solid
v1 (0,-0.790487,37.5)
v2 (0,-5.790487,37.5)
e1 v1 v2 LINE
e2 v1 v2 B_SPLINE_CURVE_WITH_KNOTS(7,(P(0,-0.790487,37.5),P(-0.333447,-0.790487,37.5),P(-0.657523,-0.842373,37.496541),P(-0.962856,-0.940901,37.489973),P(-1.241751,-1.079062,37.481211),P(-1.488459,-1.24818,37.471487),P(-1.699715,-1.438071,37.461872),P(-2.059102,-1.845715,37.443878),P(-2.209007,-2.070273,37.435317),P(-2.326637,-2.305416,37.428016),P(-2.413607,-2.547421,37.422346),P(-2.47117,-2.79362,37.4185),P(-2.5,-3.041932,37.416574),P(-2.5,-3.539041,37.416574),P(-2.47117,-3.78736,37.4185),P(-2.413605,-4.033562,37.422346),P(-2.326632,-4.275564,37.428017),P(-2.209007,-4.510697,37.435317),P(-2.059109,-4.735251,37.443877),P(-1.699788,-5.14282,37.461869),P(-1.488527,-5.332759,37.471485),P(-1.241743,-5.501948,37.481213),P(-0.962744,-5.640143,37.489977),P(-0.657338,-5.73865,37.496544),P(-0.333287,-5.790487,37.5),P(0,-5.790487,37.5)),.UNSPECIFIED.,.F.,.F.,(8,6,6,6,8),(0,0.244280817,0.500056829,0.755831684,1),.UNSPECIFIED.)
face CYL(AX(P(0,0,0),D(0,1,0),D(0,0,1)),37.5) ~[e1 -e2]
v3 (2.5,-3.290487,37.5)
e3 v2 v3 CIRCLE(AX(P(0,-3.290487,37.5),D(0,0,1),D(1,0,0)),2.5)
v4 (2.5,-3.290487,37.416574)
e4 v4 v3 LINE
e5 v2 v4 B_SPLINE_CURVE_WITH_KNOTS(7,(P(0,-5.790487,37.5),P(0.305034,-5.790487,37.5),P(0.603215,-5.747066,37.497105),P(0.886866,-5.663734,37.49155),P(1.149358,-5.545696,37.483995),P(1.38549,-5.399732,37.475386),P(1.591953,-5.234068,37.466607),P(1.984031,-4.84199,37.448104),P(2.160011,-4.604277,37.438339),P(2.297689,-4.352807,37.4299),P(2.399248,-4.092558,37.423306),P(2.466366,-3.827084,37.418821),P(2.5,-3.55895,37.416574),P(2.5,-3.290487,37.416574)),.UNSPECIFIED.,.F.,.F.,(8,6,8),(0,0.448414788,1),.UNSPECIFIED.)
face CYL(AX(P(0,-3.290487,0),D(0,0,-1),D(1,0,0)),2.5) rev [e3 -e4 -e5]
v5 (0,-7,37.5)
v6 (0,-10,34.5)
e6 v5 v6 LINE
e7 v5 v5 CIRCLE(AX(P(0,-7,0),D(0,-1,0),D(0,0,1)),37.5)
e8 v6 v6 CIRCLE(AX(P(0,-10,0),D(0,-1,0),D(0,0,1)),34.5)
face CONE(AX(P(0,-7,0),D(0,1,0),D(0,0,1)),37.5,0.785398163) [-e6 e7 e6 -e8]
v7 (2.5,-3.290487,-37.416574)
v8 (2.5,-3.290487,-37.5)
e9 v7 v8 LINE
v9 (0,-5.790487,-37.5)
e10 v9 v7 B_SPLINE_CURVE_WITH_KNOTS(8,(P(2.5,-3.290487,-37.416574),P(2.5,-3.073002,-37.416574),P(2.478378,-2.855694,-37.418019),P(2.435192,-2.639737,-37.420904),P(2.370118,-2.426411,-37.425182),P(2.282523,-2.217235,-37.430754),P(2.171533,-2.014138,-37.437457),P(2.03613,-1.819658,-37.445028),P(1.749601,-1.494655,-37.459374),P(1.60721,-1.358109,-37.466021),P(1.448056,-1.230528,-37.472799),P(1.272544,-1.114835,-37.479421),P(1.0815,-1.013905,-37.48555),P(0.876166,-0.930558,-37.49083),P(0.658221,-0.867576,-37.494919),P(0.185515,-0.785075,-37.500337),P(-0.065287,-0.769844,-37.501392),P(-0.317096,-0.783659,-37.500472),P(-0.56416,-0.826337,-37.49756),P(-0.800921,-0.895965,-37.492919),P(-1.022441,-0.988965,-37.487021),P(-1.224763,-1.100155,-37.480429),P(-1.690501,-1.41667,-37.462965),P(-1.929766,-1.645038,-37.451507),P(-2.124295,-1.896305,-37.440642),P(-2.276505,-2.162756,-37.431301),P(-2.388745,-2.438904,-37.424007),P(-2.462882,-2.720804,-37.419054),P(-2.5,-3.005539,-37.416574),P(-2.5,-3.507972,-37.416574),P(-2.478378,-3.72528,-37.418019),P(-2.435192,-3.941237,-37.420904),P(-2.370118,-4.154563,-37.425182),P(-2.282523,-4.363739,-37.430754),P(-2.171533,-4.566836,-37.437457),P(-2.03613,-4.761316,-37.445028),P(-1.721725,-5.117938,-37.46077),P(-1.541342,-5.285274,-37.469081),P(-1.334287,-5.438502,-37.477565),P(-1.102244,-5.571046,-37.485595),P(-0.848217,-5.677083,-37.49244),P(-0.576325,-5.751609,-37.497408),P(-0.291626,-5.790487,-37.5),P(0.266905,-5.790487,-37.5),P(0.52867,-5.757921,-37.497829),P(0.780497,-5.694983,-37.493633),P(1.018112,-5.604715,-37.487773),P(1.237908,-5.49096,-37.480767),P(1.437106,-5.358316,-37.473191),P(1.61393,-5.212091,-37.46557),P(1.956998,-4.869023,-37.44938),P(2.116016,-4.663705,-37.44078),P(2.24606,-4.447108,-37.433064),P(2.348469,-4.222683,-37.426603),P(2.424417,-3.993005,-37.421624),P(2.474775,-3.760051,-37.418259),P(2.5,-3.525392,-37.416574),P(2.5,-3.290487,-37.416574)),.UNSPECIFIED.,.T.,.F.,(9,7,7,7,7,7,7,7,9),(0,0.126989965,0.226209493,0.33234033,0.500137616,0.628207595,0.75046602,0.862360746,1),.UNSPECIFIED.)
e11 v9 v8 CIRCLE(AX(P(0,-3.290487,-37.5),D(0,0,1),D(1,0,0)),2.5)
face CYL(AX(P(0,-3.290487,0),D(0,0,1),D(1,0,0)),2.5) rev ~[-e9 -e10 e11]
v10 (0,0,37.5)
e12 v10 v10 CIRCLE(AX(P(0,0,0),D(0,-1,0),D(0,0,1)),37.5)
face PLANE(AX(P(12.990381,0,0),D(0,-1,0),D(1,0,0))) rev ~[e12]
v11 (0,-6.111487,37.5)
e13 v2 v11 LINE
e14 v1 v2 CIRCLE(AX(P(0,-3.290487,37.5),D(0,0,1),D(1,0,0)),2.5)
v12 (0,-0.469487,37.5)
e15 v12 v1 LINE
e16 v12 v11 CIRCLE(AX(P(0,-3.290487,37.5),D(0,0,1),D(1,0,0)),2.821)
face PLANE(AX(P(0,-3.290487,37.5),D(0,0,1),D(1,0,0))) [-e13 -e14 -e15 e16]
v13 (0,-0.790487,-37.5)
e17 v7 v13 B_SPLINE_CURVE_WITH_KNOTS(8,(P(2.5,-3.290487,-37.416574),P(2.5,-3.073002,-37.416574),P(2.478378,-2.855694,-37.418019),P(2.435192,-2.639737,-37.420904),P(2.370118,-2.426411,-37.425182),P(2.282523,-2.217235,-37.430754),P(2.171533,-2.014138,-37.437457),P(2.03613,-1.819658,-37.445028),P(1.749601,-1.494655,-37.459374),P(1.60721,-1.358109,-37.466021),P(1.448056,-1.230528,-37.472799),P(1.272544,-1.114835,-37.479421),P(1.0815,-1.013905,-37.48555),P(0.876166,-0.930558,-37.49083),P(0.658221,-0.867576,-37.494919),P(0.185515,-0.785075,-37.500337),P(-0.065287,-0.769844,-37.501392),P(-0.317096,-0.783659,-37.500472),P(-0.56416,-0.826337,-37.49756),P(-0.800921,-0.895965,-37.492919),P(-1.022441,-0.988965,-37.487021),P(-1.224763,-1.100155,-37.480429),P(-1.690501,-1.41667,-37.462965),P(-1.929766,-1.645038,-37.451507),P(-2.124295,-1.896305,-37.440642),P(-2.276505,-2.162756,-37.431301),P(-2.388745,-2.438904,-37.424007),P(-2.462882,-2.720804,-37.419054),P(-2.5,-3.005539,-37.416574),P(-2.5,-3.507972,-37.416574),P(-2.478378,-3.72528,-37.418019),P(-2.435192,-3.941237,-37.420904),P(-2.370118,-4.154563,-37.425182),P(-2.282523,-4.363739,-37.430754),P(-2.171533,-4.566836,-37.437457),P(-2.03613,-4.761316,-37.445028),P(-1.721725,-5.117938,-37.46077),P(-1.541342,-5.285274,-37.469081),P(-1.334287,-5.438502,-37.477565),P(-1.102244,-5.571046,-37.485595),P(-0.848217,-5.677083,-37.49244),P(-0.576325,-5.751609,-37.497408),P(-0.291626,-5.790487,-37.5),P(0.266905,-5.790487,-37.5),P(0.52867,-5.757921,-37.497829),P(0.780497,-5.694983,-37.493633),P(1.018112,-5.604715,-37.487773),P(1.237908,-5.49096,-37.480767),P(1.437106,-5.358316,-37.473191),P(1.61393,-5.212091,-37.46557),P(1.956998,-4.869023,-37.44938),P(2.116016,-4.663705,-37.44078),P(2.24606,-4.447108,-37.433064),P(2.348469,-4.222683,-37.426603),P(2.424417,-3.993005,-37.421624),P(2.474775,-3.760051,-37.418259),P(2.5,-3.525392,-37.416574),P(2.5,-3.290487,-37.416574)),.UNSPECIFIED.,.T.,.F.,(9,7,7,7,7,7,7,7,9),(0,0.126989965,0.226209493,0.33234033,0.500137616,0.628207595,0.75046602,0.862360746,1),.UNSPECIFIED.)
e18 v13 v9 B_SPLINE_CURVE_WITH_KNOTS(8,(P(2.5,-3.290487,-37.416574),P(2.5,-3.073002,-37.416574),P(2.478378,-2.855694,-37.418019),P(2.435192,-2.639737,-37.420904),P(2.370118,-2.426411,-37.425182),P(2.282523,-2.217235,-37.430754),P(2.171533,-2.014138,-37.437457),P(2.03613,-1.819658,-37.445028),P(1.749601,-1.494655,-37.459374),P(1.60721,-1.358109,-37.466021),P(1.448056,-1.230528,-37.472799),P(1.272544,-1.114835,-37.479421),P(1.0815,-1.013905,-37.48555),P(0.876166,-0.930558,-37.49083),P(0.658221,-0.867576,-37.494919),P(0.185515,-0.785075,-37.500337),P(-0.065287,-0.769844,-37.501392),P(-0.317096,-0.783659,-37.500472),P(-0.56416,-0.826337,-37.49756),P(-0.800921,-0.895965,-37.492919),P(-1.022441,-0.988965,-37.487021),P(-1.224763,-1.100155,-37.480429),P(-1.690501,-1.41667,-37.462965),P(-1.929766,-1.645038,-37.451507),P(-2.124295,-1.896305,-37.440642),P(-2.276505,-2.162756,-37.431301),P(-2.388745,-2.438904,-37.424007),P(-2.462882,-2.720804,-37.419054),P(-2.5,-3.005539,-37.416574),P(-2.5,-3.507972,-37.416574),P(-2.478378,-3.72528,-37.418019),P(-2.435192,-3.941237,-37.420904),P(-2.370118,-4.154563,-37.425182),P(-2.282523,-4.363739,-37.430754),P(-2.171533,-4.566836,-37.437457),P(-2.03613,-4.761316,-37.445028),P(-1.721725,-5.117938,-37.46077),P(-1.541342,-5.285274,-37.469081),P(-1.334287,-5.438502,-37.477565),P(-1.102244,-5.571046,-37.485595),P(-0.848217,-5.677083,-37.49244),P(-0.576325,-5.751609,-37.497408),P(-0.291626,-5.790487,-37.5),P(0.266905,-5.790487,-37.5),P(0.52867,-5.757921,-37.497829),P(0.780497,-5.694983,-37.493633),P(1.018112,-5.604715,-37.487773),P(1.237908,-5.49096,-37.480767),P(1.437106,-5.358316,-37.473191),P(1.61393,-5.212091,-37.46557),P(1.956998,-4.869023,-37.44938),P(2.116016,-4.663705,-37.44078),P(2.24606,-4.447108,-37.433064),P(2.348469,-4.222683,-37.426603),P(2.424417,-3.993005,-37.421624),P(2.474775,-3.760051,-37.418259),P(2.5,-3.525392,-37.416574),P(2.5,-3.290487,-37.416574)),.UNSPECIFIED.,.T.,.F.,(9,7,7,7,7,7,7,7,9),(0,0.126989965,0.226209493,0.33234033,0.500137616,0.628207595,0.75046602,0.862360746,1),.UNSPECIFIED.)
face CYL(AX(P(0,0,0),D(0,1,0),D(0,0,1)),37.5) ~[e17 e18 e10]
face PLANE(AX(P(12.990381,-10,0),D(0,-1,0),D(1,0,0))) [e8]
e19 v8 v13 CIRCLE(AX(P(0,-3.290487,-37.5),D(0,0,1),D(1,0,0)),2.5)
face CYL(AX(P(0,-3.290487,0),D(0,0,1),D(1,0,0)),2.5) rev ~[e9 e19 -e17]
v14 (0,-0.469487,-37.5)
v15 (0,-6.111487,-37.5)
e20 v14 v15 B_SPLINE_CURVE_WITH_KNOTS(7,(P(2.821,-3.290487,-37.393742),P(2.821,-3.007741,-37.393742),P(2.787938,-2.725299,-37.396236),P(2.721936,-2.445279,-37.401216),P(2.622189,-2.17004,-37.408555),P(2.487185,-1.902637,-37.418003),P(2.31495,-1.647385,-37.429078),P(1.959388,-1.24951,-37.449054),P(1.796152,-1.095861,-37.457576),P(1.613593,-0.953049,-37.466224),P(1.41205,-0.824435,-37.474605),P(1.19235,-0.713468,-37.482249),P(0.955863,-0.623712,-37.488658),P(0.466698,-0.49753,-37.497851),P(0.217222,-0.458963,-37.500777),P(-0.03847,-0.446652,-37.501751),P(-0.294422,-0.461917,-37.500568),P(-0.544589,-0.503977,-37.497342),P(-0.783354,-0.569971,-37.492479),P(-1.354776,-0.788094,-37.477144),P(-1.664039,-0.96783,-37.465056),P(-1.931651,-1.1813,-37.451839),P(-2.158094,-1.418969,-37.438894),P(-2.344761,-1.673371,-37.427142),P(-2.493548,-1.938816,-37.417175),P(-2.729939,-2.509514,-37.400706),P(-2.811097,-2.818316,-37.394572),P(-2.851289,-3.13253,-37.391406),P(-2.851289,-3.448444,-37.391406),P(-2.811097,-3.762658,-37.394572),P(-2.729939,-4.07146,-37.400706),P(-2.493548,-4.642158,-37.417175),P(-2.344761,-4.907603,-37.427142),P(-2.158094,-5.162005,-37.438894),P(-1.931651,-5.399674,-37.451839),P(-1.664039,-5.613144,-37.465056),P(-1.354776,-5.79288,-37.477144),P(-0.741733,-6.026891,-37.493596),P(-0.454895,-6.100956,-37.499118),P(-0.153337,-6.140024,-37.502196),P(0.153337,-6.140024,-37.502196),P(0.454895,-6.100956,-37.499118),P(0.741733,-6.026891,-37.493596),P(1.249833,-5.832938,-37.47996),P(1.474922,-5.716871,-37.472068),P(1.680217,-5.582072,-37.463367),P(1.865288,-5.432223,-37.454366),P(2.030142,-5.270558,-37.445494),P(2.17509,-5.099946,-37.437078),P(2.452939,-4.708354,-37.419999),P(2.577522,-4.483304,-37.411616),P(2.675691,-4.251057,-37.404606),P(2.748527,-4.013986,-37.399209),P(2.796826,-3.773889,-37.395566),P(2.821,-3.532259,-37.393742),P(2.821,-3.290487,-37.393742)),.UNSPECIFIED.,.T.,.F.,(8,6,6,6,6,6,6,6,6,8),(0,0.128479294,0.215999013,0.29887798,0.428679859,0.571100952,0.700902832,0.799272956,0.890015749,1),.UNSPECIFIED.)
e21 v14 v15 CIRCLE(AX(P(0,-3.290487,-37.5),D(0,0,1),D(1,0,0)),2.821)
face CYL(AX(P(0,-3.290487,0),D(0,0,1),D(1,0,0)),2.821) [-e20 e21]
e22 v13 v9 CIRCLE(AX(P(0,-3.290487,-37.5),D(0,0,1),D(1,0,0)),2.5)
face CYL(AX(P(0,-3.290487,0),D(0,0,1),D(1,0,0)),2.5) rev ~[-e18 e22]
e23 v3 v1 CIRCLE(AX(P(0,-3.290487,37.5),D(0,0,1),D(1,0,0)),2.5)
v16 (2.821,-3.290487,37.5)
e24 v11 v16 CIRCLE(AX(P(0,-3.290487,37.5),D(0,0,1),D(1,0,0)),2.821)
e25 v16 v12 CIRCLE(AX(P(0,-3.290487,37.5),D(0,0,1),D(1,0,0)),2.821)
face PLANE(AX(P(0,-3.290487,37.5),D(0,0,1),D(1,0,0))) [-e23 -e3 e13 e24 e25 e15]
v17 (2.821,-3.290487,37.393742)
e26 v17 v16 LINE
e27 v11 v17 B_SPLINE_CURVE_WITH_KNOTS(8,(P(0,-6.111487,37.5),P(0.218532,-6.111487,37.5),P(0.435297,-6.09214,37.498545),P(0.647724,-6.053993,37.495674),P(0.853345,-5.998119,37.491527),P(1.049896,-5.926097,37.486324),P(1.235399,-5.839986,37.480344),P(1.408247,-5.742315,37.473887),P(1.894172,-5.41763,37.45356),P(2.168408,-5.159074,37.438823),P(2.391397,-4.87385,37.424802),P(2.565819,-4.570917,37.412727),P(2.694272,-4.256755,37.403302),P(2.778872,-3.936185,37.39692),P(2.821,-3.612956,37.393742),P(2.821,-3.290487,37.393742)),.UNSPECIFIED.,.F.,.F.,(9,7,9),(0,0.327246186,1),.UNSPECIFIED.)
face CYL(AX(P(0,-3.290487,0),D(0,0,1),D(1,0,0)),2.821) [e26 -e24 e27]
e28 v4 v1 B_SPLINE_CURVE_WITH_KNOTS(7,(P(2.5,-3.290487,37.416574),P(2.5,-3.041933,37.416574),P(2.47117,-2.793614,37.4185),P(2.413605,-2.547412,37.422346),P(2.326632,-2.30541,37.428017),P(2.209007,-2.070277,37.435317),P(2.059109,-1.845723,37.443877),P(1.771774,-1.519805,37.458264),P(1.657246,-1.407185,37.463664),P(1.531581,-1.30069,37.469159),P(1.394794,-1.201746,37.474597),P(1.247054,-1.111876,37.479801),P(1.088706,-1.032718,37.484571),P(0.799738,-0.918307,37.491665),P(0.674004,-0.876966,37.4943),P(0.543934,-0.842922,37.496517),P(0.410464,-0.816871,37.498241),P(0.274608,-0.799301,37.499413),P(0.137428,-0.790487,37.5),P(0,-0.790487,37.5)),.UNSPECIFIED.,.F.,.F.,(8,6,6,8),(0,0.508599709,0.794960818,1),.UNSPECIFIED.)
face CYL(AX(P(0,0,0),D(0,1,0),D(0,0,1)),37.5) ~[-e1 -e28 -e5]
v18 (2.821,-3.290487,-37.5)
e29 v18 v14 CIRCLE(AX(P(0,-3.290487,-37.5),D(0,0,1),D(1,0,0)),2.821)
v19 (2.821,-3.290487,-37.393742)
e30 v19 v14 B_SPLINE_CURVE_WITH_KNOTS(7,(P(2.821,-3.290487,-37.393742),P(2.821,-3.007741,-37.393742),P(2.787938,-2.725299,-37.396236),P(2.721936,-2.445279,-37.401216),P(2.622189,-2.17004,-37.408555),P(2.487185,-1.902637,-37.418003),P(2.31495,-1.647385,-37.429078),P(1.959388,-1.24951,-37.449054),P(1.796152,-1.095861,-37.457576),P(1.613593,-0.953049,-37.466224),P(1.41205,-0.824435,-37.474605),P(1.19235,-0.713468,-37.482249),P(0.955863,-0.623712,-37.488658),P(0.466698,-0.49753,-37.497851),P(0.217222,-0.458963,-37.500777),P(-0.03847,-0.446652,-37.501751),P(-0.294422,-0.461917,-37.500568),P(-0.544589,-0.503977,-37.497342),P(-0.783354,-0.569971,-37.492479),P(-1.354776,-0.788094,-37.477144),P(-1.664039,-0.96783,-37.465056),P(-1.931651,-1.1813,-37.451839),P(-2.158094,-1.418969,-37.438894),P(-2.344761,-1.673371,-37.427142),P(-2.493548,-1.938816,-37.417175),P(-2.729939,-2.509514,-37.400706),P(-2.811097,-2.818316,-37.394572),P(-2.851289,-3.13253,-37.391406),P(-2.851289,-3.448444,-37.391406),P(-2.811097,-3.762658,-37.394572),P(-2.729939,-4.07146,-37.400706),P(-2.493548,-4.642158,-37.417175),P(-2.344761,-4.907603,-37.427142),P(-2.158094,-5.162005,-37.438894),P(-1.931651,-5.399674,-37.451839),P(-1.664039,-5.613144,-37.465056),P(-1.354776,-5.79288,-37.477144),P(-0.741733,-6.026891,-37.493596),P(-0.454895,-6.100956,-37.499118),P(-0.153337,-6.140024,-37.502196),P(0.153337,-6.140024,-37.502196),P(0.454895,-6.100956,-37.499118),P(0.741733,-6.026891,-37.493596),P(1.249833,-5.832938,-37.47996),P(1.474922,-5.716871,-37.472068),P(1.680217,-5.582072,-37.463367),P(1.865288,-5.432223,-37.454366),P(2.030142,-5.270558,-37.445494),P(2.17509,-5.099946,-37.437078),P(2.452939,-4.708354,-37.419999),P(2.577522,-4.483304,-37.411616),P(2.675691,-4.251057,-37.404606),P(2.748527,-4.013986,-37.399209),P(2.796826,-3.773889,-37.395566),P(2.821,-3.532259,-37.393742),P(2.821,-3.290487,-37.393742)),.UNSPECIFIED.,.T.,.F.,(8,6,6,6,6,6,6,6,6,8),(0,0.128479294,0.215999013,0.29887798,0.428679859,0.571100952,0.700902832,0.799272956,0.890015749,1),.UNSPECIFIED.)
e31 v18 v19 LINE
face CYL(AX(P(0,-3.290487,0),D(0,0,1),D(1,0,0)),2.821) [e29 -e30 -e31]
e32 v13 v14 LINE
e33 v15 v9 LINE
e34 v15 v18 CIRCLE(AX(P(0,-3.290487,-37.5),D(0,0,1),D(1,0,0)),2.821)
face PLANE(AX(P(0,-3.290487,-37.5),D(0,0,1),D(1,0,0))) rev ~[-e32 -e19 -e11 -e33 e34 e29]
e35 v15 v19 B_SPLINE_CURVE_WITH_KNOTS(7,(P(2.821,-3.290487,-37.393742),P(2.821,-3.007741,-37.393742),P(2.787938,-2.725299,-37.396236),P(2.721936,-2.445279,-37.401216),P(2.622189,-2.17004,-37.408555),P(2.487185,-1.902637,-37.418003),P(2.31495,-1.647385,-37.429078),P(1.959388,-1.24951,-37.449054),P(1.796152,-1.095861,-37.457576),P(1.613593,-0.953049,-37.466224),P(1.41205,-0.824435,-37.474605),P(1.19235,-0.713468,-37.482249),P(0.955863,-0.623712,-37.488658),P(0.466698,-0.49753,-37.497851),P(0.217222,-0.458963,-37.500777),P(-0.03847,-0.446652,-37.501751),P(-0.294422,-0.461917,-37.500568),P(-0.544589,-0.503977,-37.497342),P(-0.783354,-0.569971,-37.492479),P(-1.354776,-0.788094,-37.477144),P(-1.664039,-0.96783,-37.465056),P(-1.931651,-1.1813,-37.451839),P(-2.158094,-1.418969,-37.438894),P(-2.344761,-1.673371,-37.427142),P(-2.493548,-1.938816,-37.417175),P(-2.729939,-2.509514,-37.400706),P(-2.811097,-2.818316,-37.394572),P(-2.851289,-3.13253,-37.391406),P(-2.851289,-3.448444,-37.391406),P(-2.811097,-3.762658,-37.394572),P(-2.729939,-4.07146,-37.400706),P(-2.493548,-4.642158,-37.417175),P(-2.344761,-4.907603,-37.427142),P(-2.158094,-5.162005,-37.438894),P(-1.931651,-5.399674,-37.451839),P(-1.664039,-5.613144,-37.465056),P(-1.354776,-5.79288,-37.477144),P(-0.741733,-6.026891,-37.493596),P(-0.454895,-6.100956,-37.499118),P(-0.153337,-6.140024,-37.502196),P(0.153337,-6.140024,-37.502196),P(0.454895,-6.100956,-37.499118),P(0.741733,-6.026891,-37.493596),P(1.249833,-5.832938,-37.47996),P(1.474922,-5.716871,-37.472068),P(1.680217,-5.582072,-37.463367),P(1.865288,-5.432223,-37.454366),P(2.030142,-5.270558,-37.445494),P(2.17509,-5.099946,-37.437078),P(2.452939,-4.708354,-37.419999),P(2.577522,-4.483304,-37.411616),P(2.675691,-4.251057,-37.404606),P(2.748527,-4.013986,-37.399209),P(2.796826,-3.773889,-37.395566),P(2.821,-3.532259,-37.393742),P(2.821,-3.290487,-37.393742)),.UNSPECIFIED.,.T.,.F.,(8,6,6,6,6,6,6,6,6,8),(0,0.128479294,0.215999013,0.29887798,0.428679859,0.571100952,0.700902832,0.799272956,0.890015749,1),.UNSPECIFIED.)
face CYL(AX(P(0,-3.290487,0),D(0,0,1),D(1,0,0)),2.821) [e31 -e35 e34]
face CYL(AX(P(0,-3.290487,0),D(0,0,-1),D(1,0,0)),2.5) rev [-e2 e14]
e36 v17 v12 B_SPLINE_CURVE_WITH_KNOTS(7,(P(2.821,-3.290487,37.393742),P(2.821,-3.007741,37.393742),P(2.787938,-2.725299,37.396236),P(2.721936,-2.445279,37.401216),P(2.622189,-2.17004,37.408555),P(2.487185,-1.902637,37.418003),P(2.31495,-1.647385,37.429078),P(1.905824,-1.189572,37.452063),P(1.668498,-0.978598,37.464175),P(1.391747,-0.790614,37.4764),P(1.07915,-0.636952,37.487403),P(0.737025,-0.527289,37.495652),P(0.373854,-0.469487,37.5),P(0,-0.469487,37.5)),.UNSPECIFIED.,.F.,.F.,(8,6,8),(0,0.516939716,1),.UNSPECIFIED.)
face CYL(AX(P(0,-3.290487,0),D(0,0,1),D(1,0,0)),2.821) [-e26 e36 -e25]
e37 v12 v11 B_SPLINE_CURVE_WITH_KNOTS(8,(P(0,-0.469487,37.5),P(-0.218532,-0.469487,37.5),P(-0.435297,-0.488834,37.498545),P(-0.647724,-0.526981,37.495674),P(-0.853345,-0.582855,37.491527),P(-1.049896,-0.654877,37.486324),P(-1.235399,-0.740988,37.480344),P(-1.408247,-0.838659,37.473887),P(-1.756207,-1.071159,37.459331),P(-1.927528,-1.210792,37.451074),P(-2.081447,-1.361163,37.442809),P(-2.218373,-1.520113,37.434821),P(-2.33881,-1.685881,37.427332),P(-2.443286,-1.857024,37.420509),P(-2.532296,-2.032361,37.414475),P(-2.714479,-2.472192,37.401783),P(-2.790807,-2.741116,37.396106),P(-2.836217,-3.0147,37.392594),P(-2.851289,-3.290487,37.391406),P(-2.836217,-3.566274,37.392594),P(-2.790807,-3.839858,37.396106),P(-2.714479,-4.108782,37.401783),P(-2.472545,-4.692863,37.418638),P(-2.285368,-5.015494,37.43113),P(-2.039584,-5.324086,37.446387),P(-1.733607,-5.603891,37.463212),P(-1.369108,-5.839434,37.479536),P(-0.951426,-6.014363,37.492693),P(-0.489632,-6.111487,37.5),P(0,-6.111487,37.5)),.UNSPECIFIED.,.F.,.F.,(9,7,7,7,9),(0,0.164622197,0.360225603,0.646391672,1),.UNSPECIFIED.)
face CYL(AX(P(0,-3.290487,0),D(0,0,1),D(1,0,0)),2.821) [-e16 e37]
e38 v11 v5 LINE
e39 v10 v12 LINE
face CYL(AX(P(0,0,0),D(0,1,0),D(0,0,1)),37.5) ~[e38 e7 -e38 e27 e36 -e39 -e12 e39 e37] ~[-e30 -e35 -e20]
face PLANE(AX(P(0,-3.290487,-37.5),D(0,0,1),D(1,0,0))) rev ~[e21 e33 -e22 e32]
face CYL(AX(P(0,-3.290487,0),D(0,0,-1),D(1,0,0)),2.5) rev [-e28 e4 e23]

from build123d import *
from build123d import SkipClean  # not in build123d's __all__

# Parameters (mm, degrees)
F1_DEPTH = 10
F2_SIZE  = 3
F3_R     = 2.821
F3_R_2   = 2.5
F4_DEPTH = 37.5
F5_DEPTH = 75


with BuildPart() as f1:
    # F0 (on Front) → F1 (new body)
    with BuildSketch(Plane.XZ):
        with BuildLine():
            ThreePointArc((37.5, 0), (26.5165042945, 26.5165042945), (0, 37.5))
            Line((0, 37.5), (0, -37.5))
            ThreePointArc((0, -37.5), (26.5165042945, -26.5165042945), (37.5, 0))
        make_face()
        with BuildLine():
            Line((0, -37.5), (0, 37.5))
            ThreePointArc((0, 37.5), (-37.5, 0), (0, -37.5))
        make_face()
    extrude(amount=F1_DEPTH)

    # F2
    f2_edges = [f1.edges().sort_by_distance(p)[0] for p in [
        (-37.5, -10, 0),
    ]]
    chamfer(f2_edges, length=F2_SIZE)

    # F3 (on Top) → F4 (join, symmetric)
    with BuildSketch(Plane.XY):
        with Locations((0, -3.2904869877)):
            Circle(F3_R)
        with Locations((0, -3.2904869877)):
            Circle(F3_R_2, mode=Mode.SUBTRACT)
    with SkipClean():  # cleaning this boolean's faces spoils the solid; the shape is the same uncleaned
        extrude(amount=F4_DEPTH, both=True)

    # F5 (add): a face of the model
    f5_faces = [f1.faces().sort_by_distance(p)[0] for p in [
        (-0.0630794776, -0.6299869877, -37.5),
    ]]
    with SkipClean():  # cleaning this boolean's faces spoils the solid; the shape is the same uncleaned
        extrude(f5_faces, amount=-F5_DEPTH)


solid = f1.part
